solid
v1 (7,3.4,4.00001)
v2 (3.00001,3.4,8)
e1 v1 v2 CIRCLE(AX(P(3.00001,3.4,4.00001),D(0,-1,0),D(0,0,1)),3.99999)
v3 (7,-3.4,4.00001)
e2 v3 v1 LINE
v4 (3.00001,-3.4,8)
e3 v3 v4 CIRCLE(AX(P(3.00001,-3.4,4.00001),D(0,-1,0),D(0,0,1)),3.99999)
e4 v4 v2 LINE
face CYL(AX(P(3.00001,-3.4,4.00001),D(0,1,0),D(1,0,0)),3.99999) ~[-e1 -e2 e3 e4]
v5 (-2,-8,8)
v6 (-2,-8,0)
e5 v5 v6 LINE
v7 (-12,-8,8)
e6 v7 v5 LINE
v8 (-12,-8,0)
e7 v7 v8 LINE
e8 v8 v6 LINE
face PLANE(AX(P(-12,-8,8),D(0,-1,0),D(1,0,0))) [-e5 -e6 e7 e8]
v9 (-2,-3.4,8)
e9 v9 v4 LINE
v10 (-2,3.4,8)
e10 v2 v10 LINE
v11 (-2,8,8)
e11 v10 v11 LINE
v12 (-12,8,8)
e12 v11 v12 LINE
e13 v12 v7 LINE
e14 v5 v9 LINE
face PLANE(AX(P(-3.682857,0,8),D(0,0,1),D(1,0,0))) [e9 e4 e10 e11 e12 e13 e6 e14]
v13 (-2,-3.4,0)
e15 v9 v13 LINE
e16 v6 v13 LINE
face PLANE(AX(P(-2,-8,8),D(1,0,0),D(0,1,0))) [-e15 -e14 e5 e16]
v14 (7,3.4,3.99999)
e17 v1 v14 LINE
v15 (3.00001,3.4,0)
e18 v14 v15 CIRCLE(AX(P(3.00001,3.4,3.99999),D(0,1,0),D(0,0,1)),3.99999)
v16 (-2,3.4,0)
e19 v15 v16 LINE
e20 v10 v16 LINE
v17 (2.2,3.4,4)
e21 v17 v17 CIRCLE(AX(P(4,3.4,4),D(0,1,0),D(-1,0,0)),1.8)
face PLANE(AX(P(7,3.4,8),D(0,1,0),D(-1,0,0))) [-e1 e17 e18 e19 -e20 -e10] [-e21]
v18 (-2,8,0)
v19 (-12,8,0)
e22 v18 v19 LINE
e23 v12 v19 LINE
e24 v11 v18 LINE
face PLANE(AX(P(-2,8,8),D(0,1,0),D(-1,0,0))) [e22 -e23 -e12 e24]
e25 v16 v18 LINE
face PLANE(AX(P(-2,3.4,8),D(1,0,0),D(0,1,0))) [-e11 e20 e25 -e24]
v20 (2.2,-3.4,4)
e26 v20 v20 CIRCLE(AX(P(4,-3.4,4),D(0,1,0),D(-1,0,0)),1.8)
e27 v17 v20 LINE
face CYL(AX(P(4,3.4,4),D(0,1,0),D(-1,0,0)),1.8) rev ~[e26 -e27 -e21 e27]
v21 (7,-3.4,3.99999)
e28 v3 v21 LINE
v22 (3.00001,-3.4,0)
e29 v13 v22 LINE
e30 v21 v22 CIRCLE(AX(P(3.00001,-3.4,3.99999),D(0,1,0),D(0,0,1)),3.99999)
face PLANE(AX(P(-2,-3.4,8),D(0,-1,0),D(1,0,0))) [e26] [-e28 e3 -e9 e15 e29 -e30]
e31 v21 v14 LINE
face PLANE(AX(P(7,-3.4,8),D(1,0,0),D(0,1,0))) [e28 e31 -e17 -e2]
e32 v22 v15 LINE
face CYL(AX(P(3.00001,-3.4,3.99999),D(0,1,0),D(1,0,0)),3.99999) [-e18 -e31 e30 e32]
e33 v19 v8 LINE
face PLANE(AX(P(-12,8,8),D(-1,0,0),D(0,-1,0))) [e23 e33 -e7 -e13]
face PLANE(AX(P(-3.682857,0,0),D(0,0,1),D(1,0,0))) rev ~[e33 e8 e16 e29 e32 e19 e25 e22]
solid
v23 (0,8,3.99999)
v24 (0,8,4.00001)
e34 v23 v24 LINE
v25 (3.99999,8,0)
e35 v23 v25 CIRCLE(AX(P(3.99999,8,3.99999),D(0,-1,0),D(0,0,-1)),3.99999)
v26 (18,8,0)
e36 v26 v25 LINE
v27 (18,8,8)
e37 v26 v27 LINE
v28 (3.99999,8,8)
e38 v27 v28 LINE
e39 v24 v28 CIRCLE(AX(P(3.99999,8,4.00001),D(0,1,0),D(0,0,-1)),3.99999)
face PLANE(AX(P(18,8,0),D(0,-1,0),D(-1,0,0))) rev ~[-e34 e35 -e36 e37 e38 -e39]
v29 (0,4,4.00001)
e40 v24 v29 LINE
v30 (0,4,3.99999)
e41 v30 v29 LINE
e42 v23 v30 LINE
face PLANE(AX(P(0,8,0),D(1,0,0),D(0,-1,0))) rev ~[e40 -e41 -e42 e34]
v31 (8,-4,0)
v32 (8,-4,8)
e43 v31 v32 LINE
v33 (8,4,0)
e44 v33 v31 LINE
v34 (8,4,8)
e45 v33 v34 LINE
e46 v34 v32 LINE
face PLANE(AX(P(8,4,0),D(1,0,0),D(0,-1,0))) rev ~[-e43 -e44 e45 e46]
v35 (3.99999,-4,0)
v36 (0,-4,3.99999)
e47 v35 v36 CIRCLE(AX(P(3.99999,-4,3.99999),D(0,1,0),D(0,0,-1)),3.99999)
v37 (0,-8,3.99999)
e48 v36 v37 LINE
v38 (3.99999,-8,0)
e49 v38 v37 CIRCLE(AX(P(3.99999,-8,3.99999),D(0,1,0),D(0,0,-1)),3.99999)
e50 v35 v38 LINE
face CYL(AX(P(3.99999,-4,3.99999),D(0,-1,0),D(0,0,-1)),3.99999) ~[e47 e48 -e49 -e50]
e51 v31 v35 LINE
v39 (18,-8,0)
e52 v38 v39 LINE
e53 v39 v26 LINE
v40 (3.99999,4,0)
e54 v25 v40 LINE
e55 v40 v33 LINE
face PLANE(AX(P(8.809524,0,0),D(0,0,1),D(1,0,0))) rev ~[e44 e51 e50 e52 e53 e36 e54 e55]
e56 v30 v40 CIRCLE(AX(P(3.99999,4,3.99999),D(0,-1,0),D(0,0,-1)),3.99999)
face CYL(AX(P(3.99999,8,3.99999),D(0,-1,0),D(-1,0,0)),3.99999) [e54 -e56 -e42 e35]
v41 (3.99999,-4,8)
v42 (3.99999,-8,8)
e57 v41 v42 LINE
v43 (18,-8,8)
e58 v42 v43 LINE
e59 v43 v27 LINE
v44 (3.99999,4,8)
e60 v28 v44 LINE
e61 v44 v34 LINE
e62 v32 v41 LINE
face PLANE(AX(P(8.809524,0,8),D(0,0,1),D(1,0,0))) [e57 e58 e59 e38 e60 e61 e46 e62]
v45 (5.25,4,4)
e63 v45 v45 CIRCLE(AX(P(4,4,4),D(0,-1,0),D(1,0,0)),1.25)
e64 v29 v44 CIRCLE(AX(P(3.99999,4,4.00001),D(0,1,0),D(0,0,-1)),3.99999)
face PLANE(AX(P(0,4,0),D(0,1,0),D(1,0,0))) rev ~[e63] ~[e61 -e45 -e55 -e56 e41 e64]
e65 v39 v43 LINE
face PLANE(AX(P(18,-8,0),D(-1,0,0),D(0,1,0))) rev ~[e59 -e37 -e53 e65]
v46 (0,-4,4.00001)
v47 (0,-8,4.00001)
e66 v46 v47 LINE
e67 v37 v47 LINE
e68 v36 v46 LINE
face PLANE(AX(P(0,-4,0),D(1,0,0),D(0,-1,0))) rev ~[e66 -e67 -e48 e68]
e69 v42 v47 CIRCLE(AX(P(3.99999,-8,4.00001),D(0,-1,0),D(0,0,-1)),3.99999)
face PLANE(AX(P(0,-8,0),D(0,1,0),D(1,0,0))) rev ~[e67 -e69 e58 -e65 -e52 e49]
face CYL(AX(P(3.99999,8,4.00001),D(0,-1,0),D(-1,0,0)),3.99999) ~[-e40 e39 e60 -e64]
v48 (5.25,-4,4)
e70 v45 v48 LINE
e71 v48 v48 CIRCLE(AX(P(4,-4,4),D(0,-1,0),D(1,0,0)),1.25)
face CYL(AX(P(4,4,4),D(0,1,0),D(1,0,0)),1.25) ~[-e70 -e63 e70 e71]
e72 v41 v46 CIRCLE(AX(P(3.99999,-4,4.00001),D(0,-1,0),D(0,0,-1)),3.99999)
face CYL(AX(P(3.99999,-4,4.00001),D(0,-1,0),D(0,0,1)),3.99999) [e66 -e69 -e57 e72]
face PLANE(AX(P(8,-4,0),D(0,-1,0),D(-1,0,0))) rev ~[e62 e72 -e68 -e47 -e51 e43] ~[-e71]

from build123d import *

# Parameters (mm, degrees)
F1_DEPTH = 8
F2_R     = 1.25
F3_DEPTH = 8
F5_DEPTH = 8
F6_R     = 1.8
F7_DEPTH = 6.8
F8_R     = 3.99999
F8_2_R   = 3.99999


# Not quite as in the source:
# - a fillet or chamfer is up to 0.001 mm smaller than in the source, because OpenCascade refuses the exact size


with BuildPart() as f1:
    # F0 (on Top) → F1 (new body)
    with BuildSketch(Plane.XY):
        Polygon((0, 8), (0, 4), (8, 4), (8, -4), (0, -4), (0, -8), (18, -8), (18, 8), align=None)
    extrude(amount=F1_DEPTH)

    # F2 (on face) → F3 (join, through all)
    with BuildSketch(Plane.XZ.offset(-4)):
        with Locations((4, 4)):
            Circle(F2_R)
    extrude(amount=F3_DEPTH)

    # F8 (radius 4 in the source; OpenCascade refuses exactly that, so slightly less here)
    f8_edges = [f1.edges().sort_by_distance(p)[0] for p in [
        (0, 6, 8),
        (0, -6, 8),
        (0, -6, 0),
        (0, 6, 0),
    ]]
    fillet(f8_edges, radius=F8_R)


with BuildPart() as f5:
    # F4 (on face) → F5 (new body, through all)
    with BuildSketch(Plane.XY.offset(8)):
        Polygon((7, -3.4), (7, 3.4), (-2, 3.4), (-2, 8), (-12, 8), (-12, -8), (-2, -8), (-2, -3.4), align=None)
    extrude(amount=-F5_DEPTH)

    # F6 (on face) → F7 (cut, through all)
    with BuildSketch(Plane(origin=(0, 3.4, 0), x_dir=(-1, 0, 0), z_dir=(0, 1, 0))):
        with Locations((-4, 4)):
            Circle(F6_R)
    extrude(amount=-F7_DEPTH, mode=Mode.SUBTRACT)

    # F8#2 (radius 4 in the source; OpenCascade refuses exactly that, so slightly less here)
    f8_2_edges = [f5.edges().sort_by_distance(p)[0] for p in [
        (7, 0, 8),
        (7, 0, 0),
    ]]
    fillet(f8_2_edges, radius=F8_2_R)


solid = Compound([f1.part, f5.part])
